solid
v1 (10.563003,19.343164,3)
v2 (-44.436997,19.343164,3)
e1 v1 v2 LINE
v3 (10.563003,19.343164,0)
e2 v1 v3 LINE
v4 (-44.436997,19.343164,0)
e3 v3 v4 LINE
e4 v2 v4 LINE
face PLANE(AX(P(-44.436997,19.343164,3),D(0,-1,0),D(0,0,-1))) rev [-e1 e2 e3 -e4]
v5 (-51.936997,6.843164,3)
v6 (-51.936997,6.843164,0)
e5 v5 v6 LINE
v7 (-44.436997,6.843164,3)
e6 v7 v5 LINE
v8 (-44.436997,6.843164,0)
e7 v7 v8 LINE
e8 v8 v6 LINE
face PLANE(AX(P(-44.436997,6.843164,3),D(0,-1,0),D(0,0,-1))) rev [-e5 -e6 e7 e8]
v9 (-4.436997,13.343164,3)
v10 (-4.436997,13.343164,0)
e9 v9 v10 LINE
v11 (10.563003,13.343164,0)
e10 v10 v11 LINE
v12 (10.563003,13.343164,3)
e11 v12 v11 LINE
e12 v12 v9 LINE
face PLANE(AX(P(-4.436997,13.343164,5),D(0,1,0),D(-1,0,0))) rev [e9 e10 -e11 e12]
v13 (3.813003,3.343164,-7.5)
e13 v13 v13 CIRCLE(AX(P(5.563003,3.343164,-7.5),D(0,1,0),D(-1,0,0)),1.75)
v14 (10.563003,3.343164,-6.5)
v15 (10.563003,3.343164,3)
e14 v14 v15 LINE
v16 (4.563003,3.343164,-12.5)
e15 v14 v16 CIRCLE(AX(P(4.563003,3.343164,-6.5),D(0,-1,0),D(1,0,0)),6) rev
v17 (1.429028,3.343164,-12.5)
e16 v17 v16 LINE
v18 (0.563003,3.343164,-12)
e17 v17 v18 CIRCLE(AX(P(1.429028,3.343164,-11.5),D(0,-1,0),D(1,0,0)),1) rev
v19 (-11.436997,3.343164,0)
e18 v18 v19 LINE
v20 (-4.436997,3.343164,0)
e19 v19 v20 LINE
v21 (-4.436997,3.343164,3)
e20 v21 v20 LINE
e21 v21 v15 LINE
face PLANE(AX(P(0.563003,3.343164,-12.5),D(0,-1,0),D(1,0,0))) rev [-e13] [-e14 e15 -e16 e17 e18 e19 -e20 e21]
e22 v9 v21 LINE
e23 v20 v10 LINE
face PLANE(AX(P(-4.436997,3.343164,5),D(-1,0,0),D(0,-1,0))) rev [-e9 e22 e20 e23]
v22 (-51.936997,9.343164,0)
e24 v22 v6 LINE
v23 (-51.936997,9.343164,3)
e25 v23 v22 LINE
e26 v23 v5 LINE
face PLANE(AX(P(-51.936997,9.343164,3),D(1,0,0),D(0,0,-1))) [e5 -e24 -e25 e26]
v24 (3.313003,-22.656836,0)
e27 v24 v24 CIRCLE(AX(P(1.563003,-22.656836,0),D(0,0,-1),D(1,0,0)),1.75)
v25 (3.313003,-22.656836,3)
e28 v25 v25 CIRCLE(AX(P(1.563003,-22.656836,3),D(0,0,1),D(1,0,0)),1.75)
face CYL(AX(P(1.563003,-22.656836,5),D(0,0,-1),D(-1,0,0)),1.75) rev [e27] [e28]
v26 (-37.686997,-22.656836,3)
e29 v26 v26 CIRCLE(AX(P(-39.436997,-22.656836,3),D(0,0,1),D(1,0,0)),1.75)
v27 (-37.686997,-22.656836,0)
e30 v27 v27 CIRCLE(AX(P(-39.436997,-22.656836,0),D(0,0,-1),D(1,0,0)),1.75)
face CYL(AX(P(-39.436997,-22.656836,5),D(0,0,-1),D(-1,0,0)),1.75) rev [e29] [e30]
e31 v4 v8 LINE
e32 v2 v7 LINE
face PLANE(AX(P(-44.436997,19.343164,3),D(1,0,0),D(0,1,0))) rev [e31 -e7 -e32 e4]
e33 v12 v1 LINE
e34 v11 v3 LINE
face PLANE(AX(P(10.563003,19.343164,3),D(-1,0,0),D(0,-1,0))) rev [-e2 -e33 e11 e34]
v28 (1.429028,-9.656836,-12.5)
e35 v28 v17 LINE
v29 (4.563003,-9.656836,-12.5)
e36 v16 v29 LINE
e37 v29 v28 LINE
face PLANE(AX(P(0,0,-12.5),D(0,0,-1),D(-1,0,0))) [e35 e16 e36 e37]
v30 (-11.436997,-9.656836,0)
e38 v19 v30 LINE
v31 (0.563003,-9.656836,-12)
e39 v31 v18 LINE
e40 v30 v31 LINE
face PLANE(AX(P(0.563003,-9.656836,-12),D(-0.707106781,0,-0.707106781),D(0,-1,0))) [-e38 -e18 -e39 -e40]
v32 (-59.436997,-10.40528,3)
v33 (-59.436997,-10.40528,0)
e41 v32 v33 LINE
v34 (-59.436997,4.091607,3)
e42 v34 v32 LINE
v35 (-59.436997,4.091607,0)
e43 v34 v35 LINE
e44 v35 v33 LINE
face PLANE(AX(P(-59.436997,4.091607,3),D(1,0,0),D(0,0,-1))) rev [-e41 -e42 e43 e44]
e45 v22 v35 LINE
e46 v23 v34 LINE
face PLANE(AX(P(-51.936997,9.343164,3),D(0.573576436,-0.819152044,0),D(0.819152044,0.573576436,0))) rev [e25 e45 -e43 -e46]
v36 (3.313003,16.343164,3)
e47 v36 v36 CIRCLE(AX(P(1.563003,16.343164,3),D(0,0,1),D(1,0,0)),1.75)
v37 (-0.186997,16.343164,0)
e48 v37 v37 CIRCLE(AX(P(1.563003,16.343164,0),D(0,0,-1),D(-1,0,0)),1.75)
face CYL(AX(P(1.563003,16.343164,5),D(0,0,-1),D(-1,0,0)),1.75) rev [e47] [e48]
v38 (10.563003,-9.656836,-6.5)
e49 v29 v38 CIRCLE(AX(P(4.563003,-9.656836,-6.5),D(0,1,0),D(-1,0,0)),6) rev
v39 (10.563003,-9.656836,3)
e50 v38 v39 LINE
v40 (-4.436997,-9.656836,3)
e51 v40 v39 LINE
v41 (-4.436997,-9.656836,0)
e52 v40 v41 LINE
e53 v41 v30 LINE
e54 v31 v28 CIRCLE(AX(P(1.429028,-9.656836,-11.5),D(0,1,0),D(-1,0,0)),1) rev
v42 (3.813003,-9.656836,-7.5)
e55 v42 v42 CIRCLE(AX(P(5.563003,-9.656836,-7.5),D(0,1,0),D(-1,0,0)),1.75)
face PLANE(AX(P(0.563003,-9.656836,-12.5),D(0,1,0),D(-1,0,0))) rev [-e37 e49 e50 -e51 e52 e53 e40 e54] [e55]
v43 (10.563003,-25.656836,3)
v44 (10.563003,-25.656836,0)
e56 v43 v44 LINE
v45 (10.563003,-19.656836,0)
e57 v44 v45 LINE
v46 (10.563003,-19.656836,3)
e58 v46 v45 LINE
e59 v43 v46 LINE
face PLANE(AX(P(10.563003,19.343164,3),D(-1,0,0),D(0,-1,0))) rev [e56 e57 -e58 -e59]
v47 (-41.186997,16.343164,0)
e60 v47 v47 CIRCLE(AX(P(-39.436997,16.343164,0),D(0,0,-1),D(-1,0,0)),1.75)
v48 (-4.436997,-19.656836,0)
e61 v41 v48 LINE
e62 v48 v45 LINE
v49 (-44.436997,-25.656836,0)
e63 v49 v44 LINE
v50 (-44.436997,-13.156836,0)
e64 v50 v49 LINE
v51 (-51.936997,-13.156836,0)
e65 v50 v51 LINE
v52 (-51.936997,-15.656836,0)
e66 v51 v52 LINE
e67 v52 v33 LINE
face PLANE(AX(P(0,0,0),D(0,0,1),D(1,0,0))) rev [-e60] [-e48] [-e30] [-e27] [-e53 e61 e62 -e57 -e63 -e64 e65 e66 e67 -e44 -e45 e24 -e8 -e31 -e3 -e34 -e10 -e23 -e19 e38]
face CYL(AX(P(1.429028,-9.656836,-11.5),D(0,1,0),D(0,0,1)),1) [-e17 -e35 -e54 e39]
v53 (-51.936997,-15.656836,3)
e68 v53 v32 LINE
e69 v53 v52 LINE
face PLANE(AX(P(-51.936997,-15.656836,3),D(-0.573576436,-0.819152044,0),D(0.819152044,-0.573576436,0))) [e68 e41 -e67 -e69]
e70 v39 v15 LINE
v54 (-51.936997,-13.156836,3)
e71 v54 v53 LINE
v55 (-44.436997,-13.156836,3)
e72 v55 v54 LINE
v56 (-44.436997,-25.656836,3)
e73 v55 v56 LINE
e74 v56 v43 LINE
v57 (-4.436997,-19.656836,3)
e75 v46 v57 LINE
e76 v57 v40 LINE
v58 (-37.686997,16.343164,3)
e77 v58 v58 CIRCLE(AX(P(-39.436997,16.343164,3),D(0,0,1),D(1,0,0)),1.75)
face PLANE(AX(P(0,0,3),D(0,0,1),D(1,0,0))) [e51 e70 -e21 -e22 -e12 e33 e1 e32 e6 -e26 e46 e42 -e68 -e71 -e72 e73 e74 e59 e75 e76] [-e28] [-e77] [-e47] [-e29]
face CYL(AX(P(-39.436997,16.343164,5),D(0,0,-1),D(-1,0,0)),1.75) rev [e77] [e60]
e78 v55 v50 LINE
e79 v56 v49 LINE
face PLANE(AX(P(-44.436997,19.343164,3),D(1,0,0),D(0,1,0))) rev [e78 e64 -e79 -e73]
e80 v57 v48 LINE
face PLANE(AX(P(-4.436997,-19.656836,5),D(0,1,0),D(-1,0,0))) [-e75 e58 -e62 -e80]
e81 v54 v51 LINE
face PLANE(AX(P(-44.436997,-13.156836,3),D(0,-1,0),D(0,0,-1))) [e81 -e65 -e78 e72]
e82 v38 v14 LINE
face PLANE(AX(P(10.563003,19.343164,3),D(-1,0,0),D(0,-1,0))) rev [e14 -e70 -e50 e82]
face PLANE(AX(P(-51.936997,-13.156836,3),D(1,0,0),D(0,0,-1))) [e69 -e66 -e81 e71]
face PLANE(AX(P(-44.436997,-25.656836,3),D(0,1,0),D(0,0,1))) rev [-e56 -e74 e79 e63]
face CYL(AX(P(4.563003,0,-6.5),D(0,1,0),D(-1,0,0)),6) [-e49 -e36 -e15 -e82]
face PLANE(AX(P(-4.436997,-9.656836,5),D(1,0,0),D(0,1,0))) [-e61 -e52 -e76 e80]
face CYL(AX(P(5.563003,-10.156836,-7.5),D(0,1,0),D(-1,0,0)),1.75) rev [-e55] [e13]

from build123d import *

# Parameters (mm, degrees)
SKETCH1_W           = 55
SKETCH1_H           = 45
BOSS_EXTRUDE1_DEPTH = 3
SKETCH2_W           = 10
SKETCH2_H           = 13
BOSS_EXTRUDE2_DEPTH = 12.5
SKETCH3_R           = 1.75
CUT_EXTRUDE1_DEPTH  = 13.5
FILLET1_R           = 6
CHAMFER1_SIZE       = 12
FILLET3_R           = 1
SKETCH4_W           = 20
SKETCH4_H           = 10
CUT_EXTRUDE3_DEPTH  = 5
SKETCH7_R           = 1.75
CUT_EXTRUDE4_DEPTH  = 5
BOSS_EXTRUDE4_DEPTH = 3


with BuildPart() as part:
    # Sketch1 → Boss-Extrude1 (new body)
    with BuildSketch(Plane.XY):
        with Locations((-16.936997319, -3.156836461)):
            Rectangle(SKETCH1_W, SKETCH1_H)
    extrude(amount=BOSS_EXTRUDE1_DEPTH)

    # Sketch2 → Boss-Extrude2 (add)
    with BuildSketch(Plane(origin=(0, 0, 0), x_dir=(-1, 0, 0), z_dir=(0, 0, -1))):
        with Locations((-5.563002681, -3.156836461)):
            Rectangle(SKETCH2_W, SKETCH2_H)
    extrude(amount=BOSS_EXTRUDE2_DEPTH)

    # Sketch3 → Cut-Extrude1 (cut)
    with BuildSketch(Plane(origin=(0, 3.343163539, 0), x_dir=(1, 0, 0), z_dir=(0, 1, 0))):
        with Locations(Location((5.563002681, 7.5, 0), (0, 0, 180))):
            Circle(SKETCH3_R)
    extrude(amount=-CUT_EXTRUDE1_DEPTH, mode=Mode.SUBTRACT)

    # Fillet1
    fillet1_edges = [part.edges().sort_by_distance(p)[0] for p in [
        (10.563002681, -3.156836461, -12.5),
    ]]
    fillet(fillet1_edges, radius=FILLET1_R)

    # Chamfer1
    chamfer1_edges = [part.edges().sort_by_distance(p)[0] for p in [
        (0.563002681, -3.156836461, 0),
    ]]
    chamfer(chamfer1_edges, length=CHAMFER1_SIZE)

    # Fillet3
    # the kernel refuses this fillet: 1 mm, written as the material it takes off along each edge
    with BuildSketch(Plane(origin=(0.563002681, 5.508227048, -12.5), x_dir=(1, 0, 0), z_dir=(0, -1, 0))) as fillet3_piece_1:
        with BuildLine():
            CenterArc((0.866025404, 1), FILLET3_R, 210, 60)
            Line((0, 0.5), (-0.017320508, 0.49))
            ThreePointArc((-0.017320508, 0.49), (-0.02, 0.25), (-0.02, 0))
            Line((-0.02, 0), (0, -0.02))
            Line((0, -0.02), (0.866025404, -0.02))
            Line((0.866025404, -0.02), (0.866025404, 0))
        make_face()
    extrude(amount=17.330127019, mode=Mode.SUBTRACT)

    # Sketch4 → Cut-Extrude3 (cut)
    with BuildSketch(Plane(origin=(0, 0, 0), x_dir=(-1, 0, 0), z_dir=(0, 0, -1))):
        with Locations((-5.563002681, 8.343163539)):
            Rectangle(SKETCH4_W, SKETCH4_H)
    cut_extrude3 = extrude(amount=-CUT_EXTRUDE3_DEPTH, mode=Mode.SUBTRACT)

    # Mirror2: Cut-Extrude3 across plane
    add(cut_extrude3.mirror(Plane.ZX.offset(-3.156836461)), mode=Mode.SUBTRACT)

    # Sketch7 → Cut-Extrude4 (cut)
    with BuildSketch(Plane(origin=(0, 0, 0), x_dir=(-1, 0, 0), z_dir=(0, 0, -1))):
        with Locations((-1.563002681, 16.343163539)):
            Circle(SKETCH7_R)
        with Locations((39.436997319, 16.343163539)):
            Circle(SKETCH7_R)
        with Locations(Location((39.436997319, -22.656836461, 0), (0, 0, 180))):
            Circle(SKETCH7_R)
        with Locations(Location((-1.563002681, -22.656836461, 0), (0, 0, 180))):
            Circle(SKETCH7_R)
    extrude(amount=-CUT_EXTRUDE4_DEPTH, mode=Mode.SUBTRACT)

    # Sketch8 → Boss-Extrude4 (add)
    with BuildSketch(Plane(origin=(0, 0, 0), x_dir=(-1, 0, 0), z_dir=(0, 0, -1))):
        Polygon((44.436997319, 6.843163539), (51.936997319, 6.843163539), (51.936997319, 9.343163539), (59.436997319, 4.091607002), (59.436997319, -10.405279925), (51.936997319, -15.656836461), (51.936997319, -13.156836461), (44.436997319, -13.156836461), align=None)
    extrude(amount=-BOSS_EXTRUDE4_DEPTH)


solid = part.part
